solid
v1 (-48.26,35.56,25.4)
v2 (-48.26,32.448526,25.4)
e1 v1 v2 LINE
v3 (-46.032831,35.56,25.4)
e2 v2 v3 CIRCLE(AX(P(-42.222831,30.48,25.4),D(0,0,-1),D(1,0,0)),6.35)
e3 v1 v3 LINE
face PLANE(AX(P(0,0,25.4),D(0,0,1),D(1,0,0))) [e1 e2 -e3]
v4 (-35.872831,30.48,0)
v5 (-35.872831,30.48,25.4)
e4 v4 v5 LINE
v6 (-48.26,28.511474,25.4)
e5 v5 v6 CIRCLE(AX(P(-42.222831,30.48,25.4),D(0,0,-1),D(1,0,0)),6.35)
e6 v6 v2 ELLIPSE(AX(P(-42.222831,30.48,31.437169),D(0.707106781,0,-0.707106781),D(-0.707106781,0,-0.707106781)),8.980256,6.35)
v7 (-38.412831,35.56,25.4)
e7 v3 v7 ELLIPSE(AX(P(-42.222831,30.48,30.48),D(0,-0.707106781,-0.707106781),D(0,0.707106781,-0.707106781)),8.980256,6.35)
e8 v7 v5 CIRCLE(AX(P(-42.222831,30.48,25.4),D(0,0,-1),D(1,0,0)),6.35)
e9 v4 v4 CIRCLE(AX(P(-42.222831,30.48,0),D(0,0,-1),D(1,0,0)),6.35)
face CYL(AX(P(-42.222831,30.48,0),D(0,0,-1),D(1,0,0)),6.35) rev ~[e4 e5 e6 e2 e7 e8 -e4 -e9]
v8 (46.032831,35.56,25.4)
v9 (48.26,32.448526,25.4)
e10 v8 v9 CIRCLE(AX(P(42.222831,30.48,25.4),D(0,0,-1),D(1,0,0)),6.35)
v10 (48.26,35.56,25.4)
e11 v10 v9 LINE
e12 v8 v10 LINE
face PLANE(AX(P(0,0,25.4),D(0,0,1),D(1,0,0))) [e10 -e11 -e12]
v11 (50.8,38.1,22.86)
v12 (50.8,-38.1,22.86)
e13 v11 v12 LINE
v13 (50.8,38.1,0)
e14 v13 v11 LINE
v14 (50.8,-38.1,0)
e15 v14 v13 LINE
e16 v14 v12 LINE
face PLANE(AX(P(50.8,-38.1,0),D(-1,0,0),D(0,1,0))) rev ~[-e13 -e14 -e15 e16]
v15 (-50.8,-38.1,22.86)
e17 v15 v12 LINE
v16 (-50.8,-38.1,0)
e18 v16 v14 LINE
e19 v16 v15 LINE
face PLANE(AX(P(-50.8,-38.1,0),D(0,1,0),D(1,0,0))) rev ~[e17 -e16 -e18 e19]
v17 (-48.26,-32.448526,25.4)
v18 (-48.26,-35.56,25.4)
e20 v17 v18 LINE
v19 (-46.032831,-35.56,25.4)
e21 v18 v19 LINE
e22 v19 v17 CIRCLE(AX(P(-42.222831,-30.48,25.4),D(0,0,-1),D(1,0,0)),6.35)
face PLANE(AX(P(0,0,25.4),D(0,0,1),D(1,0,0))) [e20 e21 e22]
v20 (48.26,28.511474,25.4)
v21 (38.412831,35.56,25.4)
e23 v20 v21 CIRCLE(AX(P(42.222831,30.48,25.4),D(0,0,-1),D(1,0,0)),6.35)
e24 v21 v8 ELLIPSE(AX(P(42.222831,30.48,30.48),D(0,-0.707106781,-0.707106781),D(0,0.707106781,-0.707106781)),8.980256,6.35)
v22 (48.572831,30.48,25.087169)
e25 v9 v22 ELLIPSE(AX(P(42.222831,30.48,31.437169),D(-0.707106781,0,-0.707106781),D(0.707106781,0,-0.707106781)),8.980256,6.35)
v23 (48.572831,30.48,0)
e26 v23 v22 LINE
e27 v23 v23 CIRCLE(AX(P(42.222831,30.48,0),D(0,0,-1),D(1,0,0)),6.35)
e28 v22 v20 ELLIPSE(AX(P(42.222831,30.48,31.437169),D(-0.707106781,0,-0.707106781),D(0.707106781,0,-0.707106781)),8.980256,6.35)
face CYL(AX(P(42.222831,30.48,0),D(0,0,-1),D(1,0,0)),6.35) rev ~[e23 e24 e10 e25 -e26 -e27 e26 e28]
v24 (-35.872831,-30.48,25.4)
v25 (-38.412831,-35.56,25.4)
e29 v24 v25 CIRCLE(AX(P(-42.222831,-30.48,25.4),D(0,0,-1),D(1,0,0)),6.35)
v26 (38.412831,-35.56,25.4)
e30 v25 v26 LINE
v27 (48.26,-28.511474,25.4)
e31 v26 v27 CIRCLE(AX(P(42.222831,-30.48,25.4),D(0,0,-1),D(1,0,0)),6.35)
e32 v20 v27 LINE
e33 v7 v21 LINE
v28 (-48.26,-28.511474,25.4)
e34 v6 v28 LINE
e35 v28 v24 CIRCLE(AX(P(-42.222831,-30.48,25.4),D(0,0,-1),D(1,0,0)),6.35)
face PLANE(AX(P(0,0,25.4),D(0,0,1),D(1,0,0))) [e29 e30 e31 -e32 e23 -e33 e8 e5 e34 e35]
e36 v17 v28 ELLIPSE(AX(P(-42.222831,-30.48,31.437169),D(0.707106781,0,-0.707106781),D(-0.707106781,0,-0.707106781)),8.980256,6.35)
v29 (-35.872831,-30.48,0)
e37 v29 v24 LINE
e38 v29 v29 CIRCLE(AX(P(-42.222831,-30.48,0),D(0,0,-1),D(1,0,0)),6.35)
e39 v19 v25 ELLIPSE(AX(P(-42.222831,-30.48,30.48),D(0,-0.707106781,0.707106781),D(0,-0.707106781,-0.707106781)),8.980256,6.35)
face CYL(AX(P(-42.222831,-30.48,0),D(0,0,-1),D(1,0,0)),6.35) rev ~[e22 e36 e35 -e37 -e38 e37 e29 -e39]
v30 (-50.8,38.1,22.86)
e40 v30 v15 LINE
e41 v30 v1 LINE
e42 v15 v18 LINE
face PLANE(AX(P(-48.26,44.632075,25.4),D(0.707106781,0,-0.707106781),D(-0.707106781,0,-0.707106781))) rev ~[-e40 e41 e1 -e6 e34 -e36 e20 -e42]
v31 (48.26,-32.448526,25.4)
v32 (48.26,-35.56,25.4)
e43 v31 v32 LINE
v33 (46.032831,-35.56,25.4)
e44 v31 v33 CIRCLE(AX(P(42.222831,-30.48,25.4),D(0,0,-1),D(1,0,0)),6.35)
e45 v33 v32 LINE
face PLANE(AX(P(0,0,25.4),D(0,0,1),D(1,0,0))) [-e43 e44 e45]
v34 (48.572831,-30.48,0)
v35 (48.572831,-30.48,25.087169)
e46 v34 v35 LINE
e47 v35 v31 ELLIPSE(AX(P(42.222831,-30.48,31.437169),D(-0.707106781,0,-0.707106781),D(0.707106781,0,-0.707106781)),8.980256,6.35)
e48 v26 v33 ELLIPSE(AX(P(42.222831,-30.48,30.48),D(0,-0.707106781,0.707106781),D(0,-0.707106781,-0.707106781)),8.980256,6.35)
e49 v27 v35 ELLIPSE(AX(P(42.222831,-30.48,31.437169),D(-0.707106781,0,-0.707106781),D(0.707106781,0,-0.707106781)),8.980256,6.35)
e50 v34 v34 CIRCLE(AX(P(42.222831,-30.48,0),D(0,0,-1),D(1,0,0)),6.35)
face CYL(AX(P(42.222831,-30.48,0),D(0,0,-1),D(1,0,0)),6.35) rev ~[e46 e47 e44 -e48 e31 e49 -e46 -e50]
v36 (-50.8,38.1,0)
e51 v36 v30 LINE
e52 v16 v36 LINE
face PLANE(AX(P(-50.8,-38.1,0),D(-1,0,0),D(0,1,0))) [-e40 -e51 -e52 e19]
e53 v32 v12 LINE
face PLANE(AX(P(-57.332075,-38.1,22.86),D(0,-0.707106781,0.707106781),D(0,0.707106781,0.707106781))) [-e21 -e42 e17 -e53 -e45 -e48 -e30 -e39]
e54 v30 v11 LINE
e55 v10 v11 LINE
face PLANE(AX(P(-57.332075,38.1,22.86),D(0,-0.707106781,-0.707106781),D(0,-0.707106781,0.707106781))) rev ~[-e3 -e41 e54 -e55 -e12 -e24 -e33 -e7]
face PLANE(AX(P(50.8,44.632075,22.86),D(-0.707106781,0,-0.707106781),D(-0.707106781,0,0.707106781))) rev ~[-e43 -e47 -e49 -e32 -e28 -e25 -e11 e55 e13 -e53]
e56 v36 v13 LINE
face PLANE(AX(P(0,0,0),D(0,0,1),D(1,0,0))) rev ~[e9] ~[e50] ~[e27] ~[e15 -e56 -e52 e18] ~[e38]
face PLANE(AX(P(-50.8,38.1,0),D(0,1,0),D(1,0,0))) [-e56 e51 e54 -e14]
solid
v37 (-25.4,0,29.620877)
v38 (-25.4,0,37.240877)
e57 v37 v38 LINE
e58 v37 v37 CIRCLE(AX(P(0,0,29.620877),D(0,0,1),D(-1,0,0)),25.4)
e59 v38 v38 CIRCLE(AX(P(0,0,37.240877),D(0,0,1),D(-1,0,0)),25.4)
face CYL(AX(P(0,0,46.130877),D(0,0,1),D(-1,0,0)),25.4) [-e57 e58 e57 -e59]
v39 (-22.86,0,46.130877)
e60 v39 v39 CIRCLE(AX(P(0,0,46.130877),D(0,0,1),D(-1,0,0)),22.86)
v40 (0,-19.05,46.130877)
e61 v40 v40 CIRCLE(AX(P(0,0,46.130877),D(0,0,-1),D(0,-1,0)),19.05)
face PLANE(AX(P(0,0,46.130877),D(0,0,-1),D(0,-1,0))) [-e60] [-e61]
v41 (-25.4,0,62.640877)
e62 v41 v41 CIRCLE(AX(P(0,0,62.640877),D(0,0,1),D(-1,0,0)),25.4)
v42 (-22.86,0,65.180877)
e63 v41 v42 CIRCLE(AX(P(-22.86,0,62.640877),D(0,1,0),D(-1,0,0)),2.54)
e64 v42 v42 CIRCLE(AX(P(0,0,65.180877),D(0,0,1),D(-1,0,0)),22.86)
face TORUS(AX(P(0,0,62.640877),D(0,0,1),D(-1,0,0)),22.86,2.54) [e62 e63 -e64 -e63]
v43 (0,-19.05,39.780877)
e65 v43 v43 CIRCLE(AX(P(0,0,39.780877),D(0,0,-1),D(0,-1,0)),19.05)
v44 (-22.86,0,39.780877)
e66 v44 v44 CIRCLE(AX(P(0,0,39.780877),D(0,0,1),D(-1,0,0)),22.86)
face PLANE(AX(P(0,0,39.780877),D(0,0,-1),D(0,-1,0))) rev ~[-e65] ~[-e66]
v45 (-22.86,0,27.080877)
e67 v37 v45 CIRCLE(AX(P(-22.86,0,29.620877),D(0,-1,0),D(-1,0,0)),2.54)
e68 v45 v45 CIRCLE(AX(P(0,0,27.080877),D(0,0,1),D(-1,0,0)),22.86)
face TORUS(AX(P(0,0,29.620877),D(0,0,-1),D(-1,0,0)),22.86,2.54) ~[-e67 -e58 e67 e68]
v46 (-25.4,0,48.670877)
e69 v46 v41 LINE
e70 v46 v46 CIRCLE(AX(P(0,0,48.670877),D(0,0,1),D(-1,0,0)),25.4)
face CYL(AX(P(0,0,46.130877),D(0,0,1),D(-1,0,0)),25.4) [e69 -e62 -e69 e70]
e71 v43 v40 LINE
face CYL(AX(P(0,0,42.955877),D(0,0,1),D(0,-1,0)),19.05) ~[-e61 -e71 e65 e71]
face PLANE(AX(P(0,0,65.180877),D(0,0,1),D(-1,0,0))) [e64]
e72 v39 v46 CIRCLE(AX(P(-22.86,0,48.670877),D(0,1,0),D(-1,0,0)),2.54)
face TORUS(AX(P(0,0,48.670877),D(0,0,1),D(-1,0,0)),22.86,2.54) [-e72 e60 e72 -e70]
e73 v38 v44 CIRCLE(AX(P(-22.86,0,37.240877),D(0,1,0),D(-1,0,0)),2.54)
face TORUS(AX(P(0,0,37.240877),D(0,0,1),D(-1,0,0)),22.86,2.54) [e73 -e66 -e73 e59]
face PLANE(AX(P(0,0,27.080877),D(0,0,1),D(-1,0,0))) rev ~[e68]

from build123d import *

# Parameters (mm, degrees)
F0_W        = 101.6
F0_H        = 76.2
F1_DEPTH    = 25.4
F2_R        = 6.35
F3_DEPTH    = 25.4
F4_W        = 25.4
F4_H        = 38.1
F6_W        = 23.2788839974
F6_H        = 6.35
F8_T1_DEPTH = 114.6641495789
F8_T3_DEPTH = 89.2641495789
F9_R        = 2.54


# Not quite as in the source:
# - a fillet or chamfer that OpenCascade refuses, or shapes differently, is made with other operations: its cross-section is extruded or revolved along the edge and cut away or added
# - a feature names something its author has since deleted; it is built from what else it names


with BuildPart() as f1:
    # F0 (on Top) → F1 (new body)
    with BuildSketch(Plane.XY):
        Rectangle(F0_W, F0_H)
    extrude(amount=F1_DEPTH)

    # F2 (on face) → F3 (cut)
    with BuildSketch(Plane(origin=(0, 0, 0), x_dir=(1, 0, 0), z_dir=(0, 0, -1))):
        with Locations((-42.2228313982, -30.48)):
            Circle(F2_R)
        with Locations((-42.2228313982, 30.48)):
            Circle(F2_R)
        with Locations((42.2228313982, 30.48)):
            Circle(F2_R)
        with Locations((42.2228313982, -30.48)):
            Circle(F2_R)
    extrude(amount=-F3_DEPTH, mode=Mode.SUBTRACT)

    # F8: chamfer of 2.54 on 4 edges, made by hand

    # F8_s2 → F8_t1 (cut)
    with BuildSketch(Plane.YZ.offset(-57.3320747894)):
        Polygon((-38.1, 22.86), (-35.56, 25.4), (-38.1, 25.4), align=None)
        Polygon((38.1, 22.86), (35.56, 25.4), (38.1, 25.4), align=None)
    extrude(amount=F8_T1_DEPTH, mode=Mode.SUBTRACT)

    # F8_s4 → F8_t3 (cut)
    with BuildSketch(Plane.XZ.offset(-44.6320747894)):
        Polygon((50.8, 22.86), (48.26, 25.4), (50.8, 25.4), align=None)
        Polygon((-48.26, 25.4), (-50.8, 22.86), (-50.8, 25.4), align=None)
    extrude(amount=F8_T3_DEPTH, mode=Mode.SUBTRACT)


with BuildPart() as f5:
    # F4 (on Front) → F5 (revolve)
    with BuildSketch(Plane.XZ):
        with Locations((-12.7, 46.1308773281)):
            Rectangle(F4_W, F4_H)
    revolve(axis=Axis((0, 0, 46.1308773281), (0, 0, 1)))

    # F6 (on Right) → F7 (revolve, cut)
    with BuildSketch(Plane.YZ):
        with Locations((-30.6894419987, 42.9558773281)):
            Rectangle(F6_W, F6_H)
    revolve(axis=Axis((0, 0, 65.1808773281), (0, 0, -1)), mode=Mode.SUBTRACT)

    # F9
    f9_edges = [f5.edges().sort_by_distance(p)[0] for p in [
        (25.4, 0, 27.080877),
        (25.4, 0, 39.780877),
        (25.4, 0, 46.130877),
        (25.4, 0, 65.180877),
    ]]
    fillet(f9_edges, radius=F9_R)


solid = Compound([f1.part, f5.part])
